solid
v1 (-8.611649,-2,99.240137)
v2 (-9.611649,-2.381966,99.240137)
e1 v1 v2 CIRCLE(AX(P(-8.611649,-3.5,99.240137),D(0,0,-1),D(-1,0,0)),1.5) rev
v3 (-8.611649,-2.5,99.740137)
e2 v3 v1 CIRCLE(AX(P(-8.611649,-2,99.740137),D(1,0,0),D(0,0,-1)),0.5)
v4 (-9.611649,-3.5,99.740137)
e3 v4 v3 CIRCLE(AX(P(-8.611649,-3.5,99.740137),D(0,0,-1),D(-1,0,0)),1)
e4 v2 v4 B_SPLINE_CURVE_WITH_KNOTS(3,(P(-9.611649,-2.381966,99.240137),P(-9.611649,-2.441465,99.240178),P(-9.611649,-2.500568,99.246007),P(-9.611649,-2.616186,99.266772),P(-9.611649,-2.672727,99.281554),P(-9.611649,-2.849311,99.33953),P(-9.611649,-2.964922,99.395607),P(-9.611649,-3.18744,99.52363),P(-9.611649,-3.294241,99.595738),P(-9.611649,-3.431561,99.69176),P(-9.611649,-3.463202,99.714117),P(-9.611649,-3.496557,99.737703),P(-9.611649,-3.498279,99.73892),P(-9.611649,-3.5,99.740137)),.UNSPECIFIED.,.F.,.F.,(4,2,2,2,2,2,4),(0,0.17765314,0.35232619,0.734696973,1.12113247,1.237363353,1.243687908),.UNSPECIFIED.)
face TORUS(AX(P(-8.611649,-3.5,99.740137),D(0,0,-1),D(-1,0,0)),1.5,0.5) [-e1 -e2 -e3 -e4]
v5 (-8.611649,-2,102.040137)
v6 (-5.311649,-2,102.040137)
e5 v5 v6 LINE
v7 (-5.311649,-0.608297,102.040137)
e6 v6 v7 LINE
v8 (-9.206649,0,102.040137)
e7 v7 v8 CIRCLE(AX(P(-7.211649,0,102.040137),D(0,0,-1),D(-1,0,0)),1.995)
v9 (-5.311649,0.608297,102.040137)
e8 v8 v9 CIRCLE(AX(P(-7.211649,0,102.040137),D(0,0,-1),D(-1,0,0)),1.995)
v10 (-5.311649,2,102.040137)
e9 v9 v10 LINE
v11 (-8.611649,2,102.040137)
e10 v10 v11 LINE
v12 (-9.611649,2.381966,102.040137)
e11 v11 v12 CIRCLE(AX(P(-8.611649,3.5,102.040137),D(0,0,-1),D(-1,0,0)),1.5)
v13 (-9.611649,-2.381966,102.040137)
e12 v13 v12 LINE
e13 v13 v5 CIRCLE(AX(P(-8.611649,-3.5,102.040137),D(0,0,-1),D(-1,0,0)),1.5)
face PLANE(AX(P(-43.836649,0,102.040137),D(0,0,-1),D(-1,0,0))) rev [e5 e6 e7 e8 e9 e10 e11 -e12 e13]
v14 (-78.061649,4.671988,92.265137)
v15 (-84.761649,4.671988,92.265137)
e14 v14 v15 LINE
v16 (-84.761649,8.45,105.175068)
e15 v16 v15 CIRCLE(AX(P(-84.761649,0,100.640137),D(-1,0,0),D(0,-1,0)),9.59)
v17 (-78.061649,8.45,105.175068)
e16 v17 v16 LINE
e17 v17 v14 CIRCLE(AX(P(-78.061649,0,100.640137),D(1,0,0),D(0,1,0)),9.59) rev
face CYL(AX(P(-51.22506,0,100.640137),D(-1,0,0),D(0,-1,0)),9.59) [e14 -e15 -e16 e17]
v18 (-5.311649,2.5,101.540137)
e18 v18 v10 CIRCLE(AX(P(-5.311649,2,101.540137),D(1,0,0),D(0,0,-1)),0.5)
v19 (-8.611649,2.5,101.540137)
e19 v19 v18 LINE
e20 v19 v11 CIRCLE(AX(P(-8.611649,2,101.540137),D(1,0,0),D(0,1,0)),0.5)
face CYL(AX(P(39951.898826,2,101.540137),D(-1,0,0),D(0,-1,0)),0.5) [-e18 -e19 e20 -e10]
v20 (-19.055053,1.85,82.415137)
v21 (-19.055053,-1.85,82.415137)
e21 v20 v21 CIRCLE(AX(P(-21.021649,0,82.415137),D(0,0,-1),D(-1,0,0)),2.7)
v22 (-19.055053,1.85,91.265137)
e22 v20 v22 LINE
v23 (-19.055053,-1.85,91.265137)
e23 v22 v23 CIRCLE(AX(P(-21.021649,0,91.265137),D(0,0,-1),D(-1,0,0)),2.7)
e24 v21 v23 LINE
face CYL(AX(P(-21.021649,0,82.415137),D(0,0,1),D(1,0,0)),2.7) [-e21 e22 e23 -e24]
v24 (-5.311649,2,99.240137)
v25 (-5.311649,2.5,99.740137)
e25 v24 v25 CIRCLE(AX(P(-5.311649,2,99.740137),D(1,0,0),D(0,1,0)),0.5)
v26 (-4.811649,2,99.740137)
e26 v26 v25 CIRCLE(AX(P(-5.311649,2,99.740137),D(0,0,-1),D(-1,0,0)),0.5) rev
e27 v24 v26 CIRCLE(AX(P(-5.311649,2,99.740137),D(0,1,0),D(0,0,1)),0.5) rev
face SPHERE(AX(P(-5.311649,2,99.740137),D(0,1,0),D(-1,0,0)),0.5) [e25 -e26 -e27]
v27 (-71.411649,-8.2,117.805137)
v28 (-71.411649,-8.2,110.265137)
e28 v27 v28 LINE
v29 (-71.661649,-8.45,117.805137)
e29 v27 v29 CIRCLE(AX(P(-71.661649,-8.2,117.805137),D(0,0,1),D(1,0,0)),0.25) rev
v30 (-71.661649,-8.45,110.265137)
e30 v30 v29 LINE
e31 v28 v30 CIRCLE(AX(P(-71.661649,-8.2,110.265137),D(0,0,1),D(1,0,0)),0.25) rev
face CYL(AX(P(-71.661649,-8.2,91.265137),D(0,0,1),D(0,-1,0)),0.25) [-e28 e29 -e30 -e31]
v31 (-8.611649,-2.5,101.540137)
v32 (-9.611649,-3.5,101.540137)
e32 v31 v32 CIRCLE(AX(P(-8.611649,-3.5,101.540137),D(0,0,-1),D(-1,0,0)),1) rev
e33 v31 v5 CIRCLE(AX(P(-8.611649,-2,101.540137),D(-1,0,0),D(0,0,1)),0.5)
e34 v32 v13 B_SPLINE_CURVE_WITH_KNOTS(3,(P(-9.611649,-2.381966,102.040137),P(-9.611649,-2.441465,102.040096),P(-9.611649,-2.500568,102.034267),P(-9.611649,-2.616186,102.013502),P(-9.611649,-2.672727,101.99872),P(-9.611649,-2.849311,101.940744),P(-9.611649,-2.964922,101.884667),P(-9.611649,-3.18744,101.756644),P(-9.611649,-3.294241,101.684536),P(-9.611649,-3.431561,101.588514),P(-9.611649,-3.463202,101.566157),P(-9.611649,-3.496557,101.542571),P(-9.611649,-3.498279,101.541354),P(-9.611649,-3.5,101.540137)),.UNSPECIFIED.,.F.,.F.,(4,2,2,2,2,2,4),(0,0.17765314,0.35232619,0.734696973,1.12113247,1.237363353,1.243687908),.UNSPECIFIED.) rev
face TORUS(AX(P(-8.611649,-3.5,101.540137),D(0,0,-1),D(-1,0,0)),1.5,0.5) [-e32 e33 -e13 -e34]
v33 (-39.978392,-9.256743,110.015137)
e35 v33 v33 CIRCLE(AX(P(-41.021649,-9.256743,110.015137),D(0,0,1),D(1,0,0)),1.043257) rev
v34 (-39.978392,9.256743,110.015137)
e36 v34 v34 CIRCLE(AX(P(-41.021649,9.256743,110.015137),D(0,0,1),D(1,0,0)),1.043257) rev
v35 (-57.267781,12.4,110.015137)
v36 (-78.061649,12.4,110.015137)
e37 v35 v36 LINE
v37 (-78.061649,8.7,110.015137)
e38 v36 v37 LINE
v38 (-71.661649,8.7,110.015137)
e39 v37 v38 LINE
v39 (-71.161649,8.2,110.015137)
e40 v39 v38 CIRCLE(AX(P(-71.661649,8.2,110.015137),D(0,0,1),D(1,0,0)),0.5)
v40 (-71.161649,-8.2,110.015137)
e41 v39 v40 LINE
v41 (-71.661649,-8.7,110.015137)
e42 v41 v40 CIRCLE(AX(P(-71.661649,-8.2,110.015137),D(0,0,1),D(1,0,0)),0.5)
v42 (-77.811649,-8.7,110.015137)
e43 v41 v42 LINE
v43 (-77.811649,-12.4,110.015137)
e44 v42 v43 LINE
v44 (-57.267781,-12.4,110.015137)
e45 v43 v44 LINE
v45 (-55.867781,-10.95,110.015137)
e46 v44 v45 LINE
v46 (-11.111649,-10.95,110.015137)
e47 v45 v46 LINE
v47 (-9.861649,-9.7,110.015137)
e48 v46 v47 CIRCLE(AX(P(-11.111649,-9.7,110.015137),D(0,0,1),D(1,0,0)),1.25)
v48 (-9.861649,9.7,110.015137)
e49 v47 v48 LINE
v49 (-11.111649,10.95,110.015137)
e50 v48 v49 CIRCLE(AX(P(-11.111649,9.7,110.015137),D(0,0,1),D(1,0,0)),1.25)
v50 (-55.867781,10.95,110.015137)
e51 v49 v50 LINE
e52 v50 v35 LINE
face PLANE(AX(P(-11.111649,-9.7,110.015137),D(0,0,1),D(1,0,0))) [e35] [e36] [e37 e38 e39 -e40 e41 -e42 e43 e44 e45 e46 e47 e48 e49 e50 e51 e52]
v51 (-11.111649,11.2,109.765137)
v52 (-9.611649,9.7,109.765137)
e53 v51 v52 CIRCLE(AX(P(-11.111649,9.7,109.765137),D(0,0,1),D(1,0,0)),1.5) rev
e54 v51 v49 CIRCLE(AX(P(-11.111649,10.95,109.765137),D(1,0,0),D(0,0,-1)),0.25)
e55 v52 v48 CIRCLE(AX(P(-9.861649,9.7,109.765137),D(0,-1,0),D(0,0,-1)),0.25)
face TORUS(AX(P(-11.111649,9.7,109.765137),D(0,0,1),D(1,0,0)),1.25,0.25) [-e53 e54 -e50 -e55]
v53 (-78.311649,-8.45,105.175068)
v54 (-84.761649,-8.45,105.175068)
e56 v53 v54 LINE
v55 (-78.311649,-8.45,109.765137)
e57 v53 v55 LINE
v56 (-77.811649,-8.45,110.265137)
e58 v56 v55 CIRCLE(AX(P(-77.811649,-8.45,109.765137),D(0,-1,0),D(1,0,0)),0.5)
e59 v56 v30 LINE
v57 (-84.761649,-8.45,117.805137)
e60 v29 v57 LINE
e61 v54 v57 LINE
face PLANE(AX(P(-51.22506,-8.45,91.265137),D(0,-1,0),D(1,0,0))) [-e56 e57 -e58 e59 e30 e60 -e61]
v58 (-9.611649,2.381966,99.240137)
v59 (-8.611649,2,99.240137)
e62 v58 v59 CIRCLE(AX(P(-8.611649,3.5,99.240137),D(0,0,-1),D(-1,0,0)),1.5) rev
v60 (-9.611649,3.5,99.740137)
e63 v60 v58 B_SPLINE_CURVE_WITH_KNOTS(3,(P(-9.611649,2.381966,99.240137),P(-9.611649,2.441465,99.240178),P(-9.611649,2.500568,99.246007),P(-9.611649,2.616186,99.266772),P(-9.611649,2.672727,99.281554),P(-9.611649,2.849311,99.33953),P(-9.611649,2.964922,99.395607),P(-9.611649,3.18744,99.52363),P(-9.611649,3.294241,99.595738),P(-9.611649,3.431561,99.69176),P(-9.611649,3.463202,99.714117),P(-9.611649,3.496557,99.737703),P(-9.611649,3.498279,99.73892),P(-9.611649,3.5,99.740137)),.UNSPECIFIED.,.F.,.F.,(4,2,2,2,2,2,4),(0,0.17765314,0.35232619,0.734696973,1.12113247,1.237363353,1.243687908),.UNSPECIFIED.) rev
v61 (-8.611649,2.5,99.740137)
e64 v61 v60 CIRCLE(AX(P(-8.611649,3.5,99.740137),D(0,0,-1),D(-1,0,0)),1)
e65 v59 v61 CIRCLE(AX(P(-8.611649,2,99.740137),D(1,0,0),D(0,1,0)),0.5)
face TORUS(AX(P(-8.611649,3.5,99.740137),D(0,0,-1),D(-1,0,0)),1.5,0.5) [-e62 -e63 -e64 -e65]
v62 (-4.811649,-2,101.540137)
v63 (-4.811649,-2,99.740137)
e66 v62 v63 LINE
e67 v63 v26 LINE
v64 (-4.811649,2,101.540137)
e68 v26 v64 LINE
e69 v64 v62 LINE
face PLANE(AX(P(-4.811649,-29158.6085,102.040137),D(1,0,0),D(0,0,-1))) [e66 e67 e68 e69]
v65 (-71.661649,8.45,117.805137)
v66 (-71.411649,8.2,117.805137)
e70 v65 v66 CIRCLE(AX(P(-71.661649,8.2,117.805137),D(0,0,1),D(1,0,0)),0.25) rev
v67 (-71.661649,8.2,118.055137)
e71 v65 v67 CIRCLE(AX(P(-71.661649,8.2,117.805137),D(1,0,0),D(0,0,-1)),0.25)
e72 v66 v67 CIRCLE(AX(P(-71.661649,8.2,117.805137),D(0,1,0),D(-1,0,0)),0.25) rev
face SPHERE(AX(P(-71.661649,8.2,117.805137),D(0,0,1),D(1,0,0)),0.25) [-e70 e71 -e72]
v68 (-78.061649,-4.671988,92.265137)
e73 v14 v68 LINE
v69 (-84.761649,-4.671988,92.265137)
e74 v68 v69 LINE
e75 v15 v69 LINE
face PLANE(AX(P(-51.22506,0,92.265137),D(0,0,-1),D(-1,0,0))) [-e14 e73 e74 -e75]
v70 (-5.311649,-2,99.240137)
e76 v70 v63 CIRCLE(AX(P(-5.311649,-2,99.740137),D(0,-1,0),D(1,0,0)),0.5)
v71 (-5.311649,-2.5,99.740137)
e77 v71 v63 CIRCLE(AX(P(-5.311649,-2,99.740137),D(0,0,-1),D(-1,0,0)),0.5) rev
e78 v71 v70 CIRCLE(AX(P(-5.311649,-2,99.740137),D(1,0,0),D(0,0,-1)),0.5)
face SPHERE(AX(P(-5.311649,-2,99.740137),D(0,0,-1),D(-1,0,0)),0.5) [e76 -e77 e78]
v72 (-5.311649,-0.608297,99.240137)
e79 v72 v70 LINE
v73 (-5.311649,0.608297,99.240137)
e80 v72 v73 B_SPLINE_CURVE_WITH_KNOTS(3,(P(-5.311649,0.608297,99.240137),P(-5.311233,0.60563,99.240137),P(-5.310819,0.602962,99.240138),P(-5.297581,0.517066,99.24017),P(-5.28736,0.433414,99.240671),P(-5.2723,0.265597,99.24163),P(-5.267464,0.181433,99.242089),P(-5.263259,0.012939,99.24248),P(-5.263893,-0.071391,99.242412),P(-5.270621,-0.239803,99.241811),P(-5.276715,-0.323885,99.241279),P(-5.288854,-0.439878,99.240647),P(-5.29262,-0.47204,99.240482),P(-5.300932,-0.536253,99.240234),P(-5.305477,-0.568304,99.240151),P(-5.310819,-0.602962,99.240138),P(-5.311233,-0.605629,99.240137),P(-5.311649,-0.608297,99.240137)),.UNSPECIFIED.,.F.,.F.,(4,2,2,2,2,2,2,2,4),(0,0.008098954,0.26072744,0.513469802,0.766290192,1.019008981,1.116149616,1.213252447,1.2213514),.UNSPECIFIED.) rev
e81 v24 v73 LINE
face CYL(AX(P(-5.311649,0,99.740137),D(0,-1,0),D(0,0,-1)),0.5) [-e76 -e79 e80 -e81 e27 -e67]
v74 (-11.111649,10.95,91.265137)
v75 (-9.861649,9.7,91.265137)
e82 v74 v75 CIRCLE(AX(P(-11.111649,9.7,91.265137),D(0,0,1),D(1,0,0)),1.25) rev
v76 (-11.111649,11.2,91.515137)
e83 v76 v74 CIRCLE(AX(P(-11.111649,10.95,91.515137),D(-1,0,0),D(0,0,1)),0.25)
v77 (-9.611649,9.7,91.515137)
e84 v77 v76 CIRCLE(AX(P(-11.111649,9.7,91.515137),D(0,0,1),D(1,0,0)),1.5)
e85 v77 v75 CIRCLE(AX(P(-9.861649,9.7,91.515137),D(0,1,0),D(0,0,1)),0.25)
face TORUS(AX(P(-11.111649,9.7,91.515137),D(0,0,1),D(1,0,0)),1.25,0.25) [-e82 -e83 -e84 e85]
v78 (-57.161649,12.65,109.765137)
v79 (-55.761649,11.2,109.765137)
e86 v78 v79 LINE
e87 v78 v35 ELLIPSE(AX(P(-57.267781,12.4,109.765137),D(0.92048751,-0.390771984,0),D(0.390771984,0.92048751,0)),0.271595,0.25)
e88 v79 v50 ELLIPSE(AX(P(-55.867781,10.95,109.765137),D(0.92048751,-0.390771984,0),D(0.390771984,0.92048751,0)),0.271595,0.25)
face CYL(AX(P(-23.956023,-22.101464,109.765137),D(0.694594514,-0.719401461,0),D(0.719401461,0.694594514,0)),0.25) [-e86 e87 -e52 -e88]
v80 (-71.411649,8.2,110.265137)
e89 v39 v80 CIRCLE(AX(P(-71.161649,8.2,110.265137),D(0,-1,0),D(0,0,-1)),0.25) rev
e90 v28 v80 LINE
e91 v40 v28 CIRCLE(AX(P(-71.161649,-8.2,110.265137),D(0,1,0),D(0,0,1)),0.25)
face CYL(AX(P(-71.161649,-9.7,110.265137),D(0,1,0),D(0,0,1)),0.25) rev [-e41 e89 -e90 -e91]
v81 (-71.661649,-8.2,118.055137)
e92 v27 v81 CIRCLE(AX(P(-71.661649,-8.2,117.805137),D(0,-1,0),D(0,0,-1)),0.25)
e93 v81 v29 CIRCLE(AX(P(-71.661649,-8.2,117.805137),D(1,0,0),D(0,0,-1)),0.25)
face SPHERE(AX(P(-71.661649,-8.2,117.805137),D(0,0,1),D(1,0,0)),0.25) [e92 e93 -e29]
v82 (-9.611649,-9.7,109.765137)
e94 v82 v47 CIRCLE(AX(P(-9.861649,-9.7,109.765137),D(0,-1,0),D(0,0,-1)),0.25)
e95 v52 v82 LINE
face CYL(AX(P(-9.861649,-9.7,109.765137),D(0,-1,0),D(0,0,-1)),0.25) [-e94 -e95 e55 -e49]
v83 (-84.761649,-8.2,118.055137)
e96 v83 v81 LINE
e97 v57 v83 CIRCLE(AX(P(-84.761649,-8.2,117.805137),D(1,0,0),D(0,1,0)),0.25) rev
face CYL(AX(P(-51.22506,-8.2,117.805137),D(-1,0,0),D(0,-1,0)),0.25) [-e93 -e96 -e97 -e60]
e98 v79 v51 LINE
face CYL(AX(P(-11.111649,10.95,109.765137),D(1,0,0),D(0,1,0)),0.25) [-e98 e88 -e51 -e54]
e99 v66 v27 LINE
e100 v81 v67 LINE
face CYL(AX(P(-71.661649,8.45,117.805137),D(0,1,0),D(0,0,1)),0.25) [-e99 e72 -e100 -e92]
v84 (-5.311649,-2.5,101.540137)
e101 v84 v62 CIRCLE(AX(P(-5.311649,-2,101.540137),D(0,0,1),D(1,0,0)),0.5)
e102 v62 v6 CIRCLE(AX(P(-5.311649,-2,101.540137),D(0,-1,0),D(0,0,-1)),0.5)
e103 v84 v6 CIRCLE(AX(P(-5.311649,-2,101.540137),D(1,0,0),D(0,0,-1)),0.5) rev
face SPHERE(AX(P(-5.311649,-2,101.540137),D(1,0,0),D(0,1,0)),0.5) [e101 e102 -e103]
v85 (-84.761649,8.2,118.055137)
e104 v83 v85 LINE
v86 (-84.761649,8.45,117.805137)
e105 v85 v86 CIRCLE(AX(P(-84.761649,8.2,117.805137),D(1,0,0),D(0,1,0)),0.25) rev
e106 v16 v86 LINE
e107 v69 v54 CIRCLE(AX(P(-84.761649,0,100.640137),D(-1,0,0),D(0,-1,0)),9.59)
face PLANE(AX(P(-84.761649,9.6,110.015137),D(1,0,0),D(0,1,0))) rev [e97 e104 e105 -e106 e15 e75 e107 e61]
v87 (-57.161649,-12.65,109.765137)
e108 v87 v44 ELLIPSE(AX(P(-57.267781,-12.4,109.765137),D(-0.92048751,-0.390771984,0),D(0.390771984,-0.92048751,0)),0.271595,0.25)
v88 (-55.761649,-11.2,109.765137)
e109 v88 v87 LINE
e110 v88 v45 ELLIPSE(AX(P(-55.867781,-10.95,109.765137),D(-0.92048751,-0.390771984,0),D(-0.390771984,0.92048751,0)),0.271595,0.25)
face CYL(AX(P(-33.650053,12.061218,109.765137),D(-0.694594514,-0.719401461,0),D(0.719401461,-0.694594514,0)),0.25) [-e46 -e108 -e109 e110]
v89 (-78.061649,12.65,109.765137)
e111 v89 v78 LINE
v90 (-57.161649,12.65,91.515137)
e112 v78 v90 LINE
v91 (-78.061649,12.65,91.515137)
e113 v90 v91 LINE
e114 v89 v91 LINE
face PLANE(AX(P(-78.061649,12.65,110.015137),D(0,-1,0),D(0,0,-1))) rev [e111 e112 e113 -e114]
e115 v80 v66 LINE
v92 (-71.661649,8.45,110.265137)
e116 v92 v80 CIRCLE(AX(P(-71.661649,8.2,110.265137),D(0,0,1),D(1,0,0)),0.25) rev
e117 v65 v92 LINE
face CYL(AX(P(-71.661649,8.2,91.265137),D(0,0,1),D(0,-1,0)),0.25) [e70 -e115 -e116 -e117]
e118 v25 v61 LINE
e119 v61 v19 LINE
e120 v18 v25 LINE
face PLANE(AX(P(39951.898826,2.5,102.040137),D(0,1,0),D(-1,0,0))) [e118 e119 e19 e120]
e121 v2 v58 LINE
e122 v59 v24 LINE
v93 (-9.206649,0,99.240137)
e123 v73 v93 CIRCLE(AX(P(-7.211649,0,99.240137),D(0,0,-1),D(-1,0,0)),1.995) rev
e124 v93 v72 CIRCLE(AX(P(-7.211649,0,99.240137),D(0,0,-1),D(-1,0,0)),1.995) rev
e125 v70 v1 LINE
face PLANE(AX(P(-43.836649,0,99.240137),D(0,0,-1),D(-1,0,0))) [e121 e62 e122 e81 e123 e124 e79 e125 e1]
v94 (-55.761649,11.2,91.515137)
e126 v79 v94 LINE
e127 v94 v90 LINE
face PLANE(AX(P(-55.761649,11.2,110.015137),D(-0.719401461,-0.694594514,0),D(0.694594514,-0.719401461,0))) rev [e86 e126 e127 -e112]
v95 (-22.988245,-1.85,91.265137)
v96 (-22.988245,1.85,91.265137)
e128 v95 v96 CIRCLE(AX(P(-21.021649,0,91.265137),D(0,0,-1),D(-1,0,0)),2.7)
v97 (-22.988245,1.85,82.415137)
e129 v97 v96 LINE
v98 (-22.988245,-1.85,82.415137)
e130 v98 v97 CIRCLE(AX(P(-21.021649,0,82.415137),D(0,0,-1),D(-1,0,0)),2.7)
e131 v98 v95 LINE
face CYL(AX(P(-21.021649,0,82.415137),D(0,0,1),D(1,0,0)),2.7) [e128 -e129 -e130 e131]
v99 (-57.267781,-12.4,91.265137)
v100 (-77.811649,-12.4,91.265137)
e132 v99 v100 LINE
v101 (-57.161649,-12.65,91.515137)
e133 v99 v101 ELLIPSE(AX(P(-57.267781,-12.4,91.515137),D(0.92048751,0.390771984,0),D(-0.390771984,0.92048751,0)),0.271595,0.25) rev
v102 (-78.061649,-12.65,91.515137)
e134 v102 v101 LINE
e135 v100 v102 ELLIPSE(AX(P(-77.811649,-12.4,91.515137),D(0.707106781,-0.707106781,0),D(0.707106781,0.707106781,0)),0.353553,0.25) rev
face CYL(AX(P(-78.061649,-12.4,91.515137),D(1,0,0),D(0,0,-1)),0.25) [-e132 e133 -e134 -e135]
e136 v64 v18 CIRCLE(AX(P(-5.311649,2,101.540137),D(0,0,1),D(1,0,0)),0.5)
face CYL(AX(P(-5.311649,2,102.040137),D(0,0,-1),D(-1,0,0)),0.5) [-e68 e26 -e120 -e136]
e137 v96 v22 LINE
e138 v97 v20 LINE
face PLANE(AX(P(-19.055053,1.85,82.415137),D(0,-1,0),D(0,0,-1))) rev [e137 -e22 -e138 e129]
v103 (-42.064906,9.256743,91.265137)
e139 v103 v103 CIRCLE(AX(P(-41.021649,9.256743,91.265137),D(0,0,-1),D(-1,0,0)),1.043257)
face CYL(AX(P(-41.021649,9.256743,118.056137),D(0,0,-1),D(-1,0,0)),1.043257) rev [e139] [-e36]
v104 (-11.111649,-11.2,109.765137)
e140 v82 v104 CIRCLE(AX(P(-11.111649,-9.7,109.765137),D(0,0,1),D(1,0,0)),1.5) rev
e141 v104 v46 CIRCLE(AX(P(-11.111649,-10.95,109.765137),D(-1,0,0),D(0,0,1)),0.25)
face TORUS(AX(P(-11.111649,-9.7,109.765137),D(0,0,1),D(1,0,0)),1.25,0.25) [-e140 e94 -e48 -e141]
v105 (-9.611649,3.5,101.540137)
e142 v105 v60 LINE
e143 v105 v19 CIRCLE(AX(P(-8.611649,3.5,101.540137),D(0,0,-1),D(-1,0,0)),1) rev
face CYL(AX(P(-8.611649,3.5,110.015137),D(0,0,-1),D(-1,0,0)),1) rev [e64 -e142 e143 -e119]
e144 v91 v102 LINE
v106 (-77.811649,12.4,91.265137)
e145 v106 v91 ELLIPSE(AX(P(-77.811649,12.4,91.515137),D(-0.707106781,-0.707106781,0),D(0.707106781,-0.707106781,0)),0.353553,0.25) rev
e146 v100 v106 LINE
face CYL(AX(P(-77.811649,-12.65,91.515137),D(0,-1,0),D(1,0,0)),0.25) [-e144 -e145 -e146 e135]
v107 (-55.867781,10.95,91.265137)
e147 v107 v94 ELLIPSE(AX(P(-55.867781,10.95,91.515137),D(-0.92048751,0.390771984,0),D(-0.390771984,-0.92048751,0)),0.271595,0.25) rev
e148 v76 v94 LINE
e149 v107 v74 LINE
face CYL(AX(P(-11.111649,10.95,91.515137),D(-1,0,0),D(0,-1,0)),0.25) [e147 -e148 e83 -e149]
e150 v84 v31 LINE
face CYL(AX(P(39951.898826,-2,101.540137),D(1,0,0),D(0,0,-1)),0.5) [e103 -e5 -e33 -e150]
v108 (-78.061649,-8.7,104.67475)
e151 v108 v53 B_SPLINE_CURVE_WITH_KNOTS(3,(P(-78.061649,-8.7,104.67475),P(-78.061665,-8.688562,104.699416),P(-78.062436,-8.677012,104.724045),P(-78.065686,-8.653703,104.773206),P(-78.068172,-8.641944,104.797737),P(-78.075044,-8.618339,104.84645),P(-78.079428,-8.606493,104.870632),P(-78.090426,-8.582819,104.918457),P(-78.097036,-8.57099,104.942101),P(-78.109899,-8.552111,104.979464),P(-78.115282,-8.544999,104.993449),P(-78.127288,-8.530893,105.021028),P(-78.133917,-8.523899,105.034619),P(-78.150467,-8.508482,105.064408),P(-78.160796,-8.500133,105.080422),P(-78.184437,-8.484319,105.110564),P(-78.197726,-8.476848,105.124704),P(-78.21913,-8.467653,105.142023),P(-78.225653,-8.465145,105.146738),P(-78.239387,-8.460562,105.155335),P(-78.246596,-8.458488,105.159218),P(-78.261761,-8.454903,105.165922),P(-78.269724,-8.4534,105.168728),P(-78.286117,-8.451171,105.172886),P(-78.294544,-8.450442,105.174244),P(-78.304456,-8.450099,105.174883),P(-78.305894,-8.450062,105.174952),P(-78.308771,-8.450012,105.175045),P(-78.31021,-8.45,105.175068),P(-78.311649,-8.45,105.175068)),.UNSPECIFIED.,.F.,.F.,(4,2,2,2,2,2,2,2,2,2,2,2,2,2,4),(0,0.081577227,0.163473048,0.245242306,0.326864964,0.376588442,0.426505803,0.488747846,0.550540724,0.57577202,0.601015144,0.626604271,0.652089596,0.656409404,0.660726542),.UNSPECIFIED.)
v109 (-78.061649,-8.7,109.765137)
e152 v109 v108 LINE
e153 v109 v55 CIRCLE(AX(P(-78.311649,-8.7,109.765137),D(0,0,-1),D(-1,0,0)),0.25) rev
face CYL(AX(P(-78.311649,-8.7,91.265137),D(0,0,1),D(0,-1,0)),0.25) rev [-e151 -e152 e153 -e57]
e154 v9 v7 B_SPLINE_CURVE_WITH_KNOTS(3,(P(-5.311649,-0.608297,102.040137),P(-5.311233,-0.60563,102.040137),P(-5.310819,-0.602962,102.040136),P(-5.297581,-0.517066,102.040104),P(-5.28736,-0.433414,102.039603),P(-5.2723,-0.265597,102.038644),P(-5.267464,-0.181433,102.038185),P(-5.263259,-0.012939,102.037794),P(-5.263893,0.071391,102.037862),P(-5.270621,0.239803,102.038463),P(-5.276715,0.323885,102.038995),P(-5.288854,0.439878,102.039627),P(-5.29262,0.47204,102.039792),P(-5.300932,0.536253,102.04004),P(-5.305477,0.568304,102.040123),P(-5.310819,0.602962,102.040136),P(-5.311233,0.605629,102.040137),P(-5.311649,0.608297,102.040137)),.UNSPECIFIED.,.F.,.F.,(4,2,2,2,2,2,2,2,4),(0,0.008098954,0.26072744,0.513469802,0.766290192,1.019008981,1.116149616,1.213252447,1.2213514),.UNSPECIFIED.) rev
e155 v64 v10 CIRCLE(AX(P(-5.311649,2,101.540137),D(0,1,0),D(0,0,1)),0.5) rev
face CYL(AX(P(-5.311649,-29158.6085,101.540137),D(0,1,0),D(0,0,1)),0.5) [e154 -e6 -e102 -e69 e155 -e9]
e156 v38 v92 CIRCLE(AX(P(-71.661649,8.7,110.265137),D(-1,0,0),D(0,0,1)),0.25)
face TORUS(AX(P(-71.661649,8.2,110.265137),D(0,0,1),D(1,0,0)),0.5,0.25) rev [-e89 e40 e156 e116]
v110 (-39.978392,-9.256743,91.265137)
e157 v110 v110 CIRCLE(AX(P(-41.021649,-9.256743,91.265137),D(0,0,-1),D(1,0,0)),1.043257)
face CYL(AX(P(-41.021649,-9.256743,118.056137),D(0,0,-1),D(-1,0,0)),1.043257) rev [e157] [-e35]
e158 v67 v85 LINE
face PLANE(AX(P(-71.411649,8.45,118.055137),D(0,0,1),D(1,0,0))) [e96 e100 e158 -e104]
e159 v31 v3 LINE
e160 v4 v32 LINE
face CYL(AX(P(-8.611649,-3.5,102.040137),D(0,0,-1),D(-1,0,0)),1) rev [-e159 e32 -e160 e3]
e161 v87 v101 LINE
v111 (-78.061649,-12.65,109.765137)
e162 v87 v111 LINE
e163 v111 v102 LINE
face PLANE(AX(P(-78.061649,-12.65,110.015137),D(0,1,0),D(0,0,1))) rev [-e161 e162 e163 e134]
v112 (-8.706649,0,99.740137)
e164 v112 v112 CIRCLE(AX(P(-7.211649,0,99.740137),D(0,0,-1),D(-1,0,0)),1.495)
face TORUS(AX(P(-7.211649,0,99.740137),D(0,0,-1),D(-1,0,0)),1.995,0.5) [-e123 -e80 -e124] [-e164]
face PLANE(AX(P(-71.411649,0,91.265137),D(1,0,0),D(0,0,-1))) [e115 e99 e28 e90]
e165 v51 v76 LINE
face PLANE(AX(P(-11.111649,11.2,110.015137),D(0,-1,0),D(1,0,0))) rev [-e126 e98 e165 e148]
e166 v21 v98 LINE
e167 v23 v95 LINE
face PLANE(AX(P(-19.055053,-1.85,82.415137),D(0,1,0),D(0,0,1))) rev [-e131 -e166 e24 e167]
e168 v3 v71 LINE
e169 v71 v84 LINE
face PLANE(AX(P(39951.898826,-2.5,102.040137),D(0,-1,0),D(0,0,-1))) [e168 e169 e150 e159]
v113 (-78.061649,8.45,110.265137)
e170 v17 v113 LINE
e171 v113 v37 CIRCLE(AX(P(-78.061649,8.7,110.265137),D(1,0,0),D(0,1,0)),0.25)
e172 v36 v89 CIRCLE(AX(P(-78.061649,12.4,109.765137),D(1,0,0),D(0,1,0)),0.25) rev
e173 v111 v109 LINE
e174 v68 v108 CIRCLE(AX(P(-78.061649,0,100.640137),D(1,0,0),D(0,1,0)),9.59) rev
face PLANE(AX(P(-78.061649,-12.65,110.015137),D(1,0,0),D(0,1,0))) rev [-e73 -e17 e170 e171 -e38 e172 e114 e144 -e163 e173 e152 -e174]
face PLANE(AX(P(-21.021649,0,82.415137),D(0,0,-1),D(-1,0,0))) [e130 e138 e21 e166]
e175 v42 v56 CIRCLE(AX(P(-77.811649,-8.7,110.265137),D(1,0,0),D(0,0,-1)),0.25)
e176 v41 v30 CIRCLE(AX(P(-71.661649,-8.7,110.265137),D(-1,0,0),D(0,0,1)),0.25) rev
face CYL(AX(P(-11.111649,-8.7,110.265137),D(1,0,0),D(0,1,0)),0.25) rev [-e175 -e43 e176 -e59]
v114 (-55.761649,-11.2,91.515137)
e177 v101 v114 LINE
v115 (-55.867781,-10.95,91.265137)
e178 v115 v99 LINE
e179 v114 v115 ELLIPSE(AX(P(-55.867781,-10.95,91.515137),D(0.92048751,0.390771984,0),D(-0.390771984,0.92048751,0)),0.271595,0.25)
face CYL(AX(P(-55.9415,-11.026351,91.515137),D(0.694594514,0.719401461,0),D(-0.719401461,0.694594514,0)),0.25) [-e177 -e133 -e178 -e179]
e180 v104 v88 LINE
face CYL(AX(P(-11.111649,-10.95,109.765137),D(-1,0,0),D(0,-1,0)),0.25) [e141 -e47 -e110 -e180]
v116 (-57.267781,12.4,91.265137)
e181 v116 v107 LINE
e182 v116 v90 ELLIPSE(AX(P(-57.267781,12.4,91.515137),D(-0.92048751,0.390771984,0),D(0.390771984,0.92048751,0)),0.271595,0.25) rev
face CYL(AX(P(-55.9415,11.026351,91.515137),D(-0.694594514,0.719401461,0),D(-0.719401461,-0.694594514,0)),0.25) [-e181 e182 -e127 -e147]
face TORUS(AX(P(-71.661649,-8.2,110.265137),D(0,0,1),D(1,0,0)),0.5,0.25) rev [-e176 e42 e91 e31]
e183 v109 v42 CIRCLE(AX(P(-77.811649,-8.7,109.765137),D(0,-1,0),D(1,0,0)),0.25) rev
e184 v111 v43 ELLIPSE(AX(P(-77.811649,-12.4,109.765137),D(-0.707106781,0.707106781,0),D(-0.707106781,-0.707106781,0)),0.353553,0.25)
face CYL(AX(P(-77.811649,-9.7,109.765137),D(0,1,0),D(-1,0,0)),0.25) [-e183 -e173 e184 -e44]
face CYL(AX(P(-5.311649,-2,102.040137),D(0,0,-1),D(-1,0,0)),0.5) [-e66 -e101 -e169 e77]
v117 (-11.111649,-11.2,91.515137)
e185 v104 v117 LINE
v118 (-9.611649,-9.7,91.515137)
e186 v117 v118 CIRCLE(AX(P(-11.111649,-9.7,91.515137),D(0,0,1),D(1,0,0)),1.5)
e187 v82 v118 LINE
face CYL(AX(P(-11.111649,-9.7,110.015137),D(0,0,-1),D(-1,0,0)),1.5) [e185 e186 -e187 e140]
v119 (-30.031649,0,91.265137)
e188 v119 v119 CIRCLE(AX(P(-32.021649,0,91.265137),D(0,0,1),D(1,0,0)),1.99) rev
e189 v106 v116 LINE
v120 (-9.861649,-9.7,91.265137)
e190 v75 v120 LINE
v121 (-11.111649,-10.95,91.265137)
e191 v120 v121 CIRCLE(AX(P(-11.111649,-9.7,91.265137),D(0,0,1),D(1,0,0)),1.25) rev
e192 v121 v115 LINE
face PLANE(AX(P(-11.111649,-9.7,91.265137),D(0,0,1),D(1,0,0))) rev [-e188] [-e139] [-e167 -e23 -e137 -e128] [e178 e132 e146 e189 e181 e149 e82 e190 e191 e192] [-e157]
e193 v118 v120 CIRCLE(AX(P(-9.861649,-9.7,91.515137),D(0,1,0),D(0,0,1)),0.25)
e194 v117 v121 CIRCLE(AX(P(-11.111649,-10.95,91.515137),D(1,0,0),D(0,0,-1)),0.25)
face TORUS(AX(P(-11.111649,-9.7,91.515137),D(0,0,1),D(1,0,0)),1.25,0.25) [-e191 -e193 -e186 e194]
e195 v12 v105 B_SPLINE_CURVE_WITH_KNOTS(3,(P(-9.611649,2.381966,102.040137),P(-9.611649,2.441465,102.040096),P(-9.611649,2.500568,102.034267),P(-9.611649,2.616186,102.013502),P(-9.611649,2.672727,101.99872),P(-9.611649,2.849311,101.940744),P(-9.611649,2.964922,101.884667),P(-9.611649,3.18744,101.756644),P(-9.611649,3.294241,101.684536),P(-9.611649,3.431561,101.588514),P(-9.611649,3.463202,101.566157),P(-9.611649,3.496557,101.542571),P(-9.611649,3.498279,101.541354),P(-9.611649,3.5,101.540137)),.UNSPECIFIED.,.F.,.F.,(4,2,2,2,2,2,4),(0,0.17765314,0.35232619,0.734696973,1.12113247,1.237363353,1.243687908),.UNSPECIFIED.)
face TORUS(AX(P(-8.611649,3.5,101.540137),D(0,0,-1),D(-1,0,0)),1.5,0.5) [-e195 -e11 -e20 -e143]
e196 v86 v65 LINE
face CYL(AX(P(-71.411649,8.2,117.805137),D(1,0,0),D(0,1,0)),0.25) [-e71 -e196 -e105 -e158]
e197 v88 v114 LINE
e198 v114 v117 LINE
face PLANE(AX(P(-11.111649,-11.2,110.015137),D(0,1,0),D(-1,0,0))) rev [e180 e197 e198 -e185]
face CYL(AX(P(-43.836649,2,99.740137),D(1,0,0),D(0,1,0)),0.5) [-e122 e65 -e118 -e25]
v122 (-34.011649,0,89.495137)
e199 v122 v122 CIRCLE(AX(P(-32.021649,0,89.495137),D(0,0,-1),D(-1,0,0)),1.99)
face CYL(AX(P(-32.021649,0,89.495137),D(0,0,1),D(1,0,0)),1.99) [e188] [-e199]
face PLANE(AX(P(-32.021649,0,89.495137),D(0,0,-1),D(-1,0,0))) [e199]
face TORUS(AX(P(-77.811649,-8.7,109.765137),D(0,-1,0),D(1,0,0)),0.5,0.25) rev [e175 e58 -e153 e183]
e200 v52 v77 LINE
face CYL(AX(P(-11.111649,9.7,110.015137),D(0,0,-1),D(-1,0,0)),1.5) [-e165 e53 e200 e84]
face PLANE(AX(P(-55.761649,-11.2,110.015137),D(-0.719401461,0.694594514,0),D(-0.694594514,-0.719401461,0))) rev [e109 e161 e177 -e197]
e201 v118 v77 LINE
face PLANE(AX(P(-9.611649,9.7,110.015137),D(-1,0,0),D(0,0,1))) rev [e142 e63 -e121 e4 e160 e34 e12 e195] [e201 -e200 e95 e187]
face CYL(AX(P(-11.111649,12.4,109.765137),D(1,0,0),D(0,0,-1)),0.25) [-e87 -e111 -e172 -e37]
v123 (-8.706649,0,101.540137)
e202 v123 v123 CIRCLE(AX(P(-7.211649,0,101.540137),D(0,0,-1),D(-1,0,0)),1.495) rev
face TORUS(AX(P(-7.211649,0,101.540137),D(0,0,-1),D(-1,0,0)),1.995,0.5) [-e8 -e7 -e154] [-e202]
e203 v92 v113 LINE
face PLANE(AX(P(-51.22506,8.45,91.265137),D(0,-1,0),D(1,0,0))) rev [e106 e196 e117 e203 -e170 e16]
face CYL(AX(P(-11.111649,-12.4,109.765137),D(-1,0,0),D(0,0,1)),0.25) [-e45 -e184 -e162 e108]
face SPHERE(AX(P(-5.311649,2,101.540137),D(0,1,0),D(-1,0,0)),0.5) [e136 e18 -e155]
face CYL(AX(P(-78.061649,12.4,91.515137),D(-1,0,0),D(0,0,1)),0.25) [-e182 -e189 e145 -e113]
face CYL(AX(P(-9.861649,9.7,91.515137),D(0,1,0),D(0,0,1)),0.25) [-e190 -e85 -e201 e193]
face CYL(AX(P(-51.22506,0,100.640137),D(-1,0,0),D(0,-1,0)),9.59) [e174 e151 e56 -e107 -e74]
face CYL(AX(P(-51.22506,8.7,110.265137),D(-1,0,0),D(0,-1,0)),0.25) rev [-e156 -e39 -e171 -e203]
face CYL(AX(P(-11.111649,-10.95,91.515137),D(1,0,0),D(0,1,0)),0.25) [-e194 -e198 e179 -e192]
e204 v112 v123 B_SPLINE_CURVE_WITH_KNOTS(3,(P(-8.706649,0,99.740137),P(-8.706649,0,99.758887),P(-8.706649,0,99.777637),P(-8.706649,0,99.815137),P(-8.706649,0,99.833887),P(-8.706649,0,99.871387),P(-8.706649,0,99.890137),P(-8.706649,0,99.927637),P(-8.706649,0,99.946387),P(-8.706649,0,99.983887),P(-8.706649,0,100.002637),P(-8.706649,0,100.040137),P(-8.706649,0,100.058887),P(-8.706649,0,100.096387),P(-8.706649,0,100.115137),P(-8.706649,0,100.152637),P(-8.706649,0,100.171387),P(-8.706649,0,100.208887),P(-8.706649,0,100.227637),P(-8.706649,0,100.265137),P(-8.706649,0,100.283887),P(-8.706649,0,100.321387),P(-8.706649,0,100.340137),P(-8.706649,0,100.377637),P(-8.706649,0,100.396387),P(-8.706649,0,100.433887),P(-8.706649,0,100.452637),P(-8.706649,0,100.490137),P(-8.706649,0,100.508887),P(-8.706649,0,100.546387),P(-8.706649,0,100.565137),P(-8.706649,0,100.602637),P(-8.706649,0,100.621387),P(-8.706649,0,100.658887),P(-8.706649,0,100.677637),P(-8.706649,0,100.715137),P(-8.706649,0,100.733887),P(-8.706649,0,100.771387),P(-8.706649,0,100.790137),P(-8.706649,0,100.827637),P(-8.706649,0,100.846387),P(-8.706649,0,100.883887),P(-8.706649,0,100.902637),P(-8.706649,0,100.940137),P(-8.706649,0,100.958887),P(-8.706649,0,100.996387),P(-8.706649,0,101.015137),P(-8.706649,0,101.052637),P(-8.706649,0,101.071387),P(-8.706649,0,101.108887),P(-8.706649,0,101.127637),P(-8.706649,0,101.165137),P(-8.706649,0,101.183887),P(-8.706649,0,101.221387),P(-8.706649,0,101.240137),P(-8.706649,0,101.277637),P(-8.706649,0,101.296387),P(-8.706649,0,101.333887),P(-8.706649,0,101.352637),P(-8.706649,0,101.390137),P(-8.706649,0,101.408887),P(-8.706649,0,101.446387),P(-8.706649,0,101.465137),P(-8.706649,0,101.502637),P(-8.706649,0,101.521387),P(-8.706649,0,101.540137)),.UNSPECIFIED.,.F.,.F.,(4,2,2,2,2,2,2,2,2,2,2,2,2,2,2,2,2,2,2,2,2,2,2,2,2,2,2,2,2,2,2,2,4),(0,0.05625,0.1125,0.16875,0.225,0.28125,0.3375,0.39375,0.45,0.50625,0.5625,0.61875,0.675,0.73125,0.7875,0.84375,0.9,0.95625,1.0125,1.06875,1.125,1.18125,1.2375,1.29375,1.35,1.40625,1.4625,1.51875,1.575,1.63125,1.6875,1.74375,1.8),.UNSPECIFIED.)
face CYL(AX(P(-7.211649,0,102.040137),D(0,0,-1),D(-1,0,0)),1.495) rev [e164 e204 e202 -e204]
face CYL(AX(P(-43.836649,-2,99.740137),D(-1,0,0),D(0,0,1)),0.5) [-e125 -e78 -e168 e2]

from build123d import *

# Parameters (mm, degrees)
BOSS_EXTRUDE1_DEPTH      = 187.5
CUT_EXTRUDE5_DEPTH       = 67
SKETCH4_W                = 80.4
SKETCH4_H                = 169
BOSS_EXTRUDE2_DEPTH      = 133.5
BOSS_EXTRUDE3_DEPTH      = 14
BOSS_EXTRUDE3_DEPTH_BACK = 14
BOSS_EXTRUDE3_START      = -93.75
SKETCH5_W                = 48
SKETCH5_H                = 50
SKETCH5_R                = 14.95
SCALE1_SCALE             = 0.1
CUT_EXTRUDE6_REACH       = 91.79
SKETCH6_R                = 1.043257281
BOSS_EXTRUDE4_DEPTH      = 8.85
SKETCH8_R                = 1.99
BOSS_EXTRUDE5_DEPTH      = 1.77
FILLET1_R                = 1
FILLET2_R                = 0.5
FILLET3_R                = 0.25


with BuildPart() as part:
    # Sketch1 → Boss-Extrude1 (new body)
    with BuildSketch(Plane.XY):
        with BuildLine():
            Line((-342.25, 126.5), (-342.25, 96))
            Line((-342.25, 96), (-409.25, 96))
            Line((-409.25, 96), (-409.25, -96))
            Line((-409.25, -96), (-342.25, -96))
            Line((-342.25, -96), (-342.25, -126.5))
            Line((-342.25, -126.5), (-133.25, -126.5))
            Line((-133.25, -126.5), (-119.25, -112))
            Line((-119.25, -112), (327.25, -112))
            ThreePointArc((327.25, -112), (337.856601718, -107.606601718), (342.25, -97))
            Line((342.25, -97), (342.25, 97))
            ThreePointArc((342.25, 97), (337.856601718, 107.606601718), (327.25, 112))
            Line((327.25, 112), (-119.25, 112))
            Line((-119.25, 112), (-133.25, 126.5))
            Line((-133.25, 126.5), (-342.25, 126.5))
        make_face()
    extrude(amount=BOSS_EXTRUDE1_DEPTH)

    # Sketch3 → Cut-Extrude5 (cut)
    with BuildSketch(Plane.ZY.offset(409.25)):
        with BuildLine():
            Line((187.5, 96), (0, 96))
            Line((0, 96), (0, -96))
            Line((0, -96), (187.5, -96))
            Line((187.5, -96), (187.5, -84.5))
            Line((187.5, -84.5), (139.09931091, -84.5))
            ThreePointArc((139.09931091, -84.5), (66.815124203, -92.039787406), (10, -46.719883347))
            Line((10, -46.719883347), (10, 46.719883347))
            ThreePointArc((10, 46.719883347), (66.815124203, 92.039787406), (139.09931091, 84.5))
            Line((139.09931091, 84.5), (187.5, 84.5))
            Line((187.5, 84.5), (187.5, 96))
        make_face()
    extrude(amount=-CUT_EXTRUDE5_DEPTH, mode=Mode.SUBTRACT)

    # Sketch4 → Boss-Extrude2 (add)
    with BuildSketch(Plane.ZY.offset(409.25)):
        with Locations((227.7, 0)):
            Rectangle(SKETCH4_W, SKETCH4_H)
    extrude(amount=-BOSS_EXTRUDE2_DEPTH)

    # Sketch5 → Boss-Extrude3 (add, two sides: drawn at the far end of the back side and taken through both)
    with BuildSketch(Plane(origin=(0, 0, 0), x_dir=(-1, 0, 0), z_dir=(0, 0, -1)).offset(BOSS_EXTRUDE3_START - BOSS_EXTRUDE3_DEPTH_BACK)):
        with Locations((-366.25, 0)):
            Rectangle(SKETCH5_W, SKETCH5_H)
        with Locations((-366.25, 0)):
            Circle(SKETCH5_R, mode=Mode.SUBTRACT)
    extrude(amount=BOSS_EXTRUDE3_DEPTH + BOSS_EXTRUDE3_DEPTH_BACK)


with BuildPart() as part_1:
    # Scale1: scaled about (-48.707387948, 0, 101.405707756)
    add(part.part.scale(SCALE1_SCALE).moved(Location((-43.836649153, 0, 91.26513698))))

    # Sketch6 → Cut-Extrude6 (cut, up to next)
    with BuildSketch(Plane(origin=(0, 0, 91.26513698), x_dir=(-1, 0, 0), z_dir=(0, 0, -1)), mode=Mode.PRIVATE) as cut_extrude6_sk1:
        with Locations((41.021649153, 9.256742719)):
            Circle(SKETCH6_R)
    cut_extrude6_tool1 = extrude(cut_extrude6_sk1.sketch, amount=-CUT_EXTRUDE6_REACH, mode=Mode.PRIVATE) & part_1.part
    # Sketch6 → Cut-Extrude6 (cut, up to next)
    with BuildSketch(Plane(origin=(0, 0, 91.26513698), x_dir=(-1, 0, 0), z_dir=(0, 0, -1)), mode=Mode.PRIVATE) as cut_extrude6_sk2:
        with Locations(Location((41.021649153, -9.256742719, 0), (0, 0, 180))):
            Circle(SKETCH6_R)
    cut_extrude6_tool2 = extrude(cut_extrude6_sk2.sketch, amount=-CUT_EXTRUDE6_REACH, mode=Mode.PRIVATE) & part_1.part
    add(cut_extrude6_tool1.solids().sort_by_distance((-41.021649, 9.256743, 91.265137))[0], mode=Mode.SUBTRACT)
    add(cut_extrude6_tool2.solids().sort_by_distance((-41.021649, -9.256743, 91.265137))[0], mode=Mode.SUBTRACT)

    # Sketch7 → Boss-Extrude4 (add)
    with BuildSketch(Plane(origin=(0, 0, 91.26513698), x_dir=(-1, 0, 0), z_dir=(0, 0, -1))):
        with BuildLine():
            Line((19.055053109, 1.85), (22.988245197, 1.85))
            ThreePointArc((22.988245197, 1.85), (23.721649153, 0), (22.988245197, -1.85))
            Line((22.988245197, -1.85), (19.055053109, -1.85))
            ThreePointArc((19.055053109, -1.85), (18.321649153, 0), (19.055053109, 1.85))
        make_face()
    extrude(amount=BOSS_EXTRUDE4_DEPTH)

    # Sketch8 → Boss-Extrude5 (add)
    with BuildSketch(Plane(origin=(0, 0, 91.26513698), x_dir=(-1, 0, 0), z_dir=(0, 0, -1))):
        with Locations(Location((32.021649153, 0, 0), (0, 0, 180))):
            Circle(SKETCH8_R)
    extrude(amount=BOSS_EXTRUDE5_DEPTH)

    # Fillet1
    fillet1_edges = [part_1.edges().sort_by_distance(p)[0] for p in [
        (-9.611649153, 2.5, 100.64013698),
        (-9.611649153, -2.5, 100.64013698),
    ]]
    fillet(fillet1_edges, radius=FILLET1_R)

    # Fillet2
    # the kernel refuses this fillet: 0.5 mm, written as the material it takes off along each edge
    with BuildSketch(Plane(origin=(-5.311649153, 2, 99.74013698), x_dir=(0, 0, -1), z_dir=(0, 1, 0))) as fillet2_piece_1_section:
        Polygon((0, 0), (FILLET2_R * 1.02, 0), (FILLET2_R * 1.02, -FILLET2_R * 1.02), (0, -FILLET2_R * 1.02), align=None)
    fillet2_piece_1 = extrude(amount=FILLET2_R * 1.02, mode=Mode.PRIVATE)
    fillet2_piece_1 = fillet2_piece_1 - Plane(origin=(-5.311649153, 2, 99.74013698), x_dir=(-0.7071067811865475, 0, 0.7071067811865475), z_dir=(0, 1, 0)) * Sphere(FILLET2_R, mode=Mode.PRIVATE)
    add(fillet2_piece_1, mode=Mode.SUBTRACT)
    with BuildSketch(Plane(origin=(-5.311649153, 2, 101.54013698), x_dir=(0, 0, 1), z_dir=(0, 1, 0))) as fillet2_piece_2_section:
        Polygon((0, 0), (FILLET2_R * 1.02, 0), (FILLET2_R * 1.02, FILLET2_R * 1.02), (0, FILLET2_R * 1.02), align=None)
    fillet2_piece_2 = extrude(amount=FILLET2_R * 1.02, mode=Mode.PRIVATE)
    fillet2_piece_2 = fillet2_piece_2 - Plane(origin=(-5.311649153, 2, 101.54013698), x_dir=(-0.7071067811865475, 0, -0.7071067811865475), z_dir=(0, 1, 0)) * Sphere(FILLET2_R, mode=Mode.PRIVATE)
    add(fillet2_piece_2, mode=Mode.SUBTRACT)
    with BuildSketch(Plane(origin=(-5.311649153, -2, 101.54013698), x_dir=(0, -1, 0), z_dir=(0, 0, 1))) as fillet2_piece_3_section:
        Polygon((0, 0), (FILLET2_R * 1.02, 0), (FILLET2_R * 1.02, FILLET2_R * 1.02), (0, FILLET2_R * 1.02), align=None)
    fillet2_piece_3 = extrude(amount=FILLET2_R * 1.02, mode=Mode.PRIVATE)
    fillet2_piece_3 = fillet2_piece_3 - Plane(origin=(-5.311649153, -2, 101.54013698), x_dir=(-0.7071067811865475, 0.7071067811865475, 0), z_dir=(0, 0, 1)) * Sphere(FILLET2_R, mode=Mode.PRIVATE)
    add(fillet2_piece_3, mode=Mode.SUBTRACT)
    with BuildSketch(Plane(origin=(-5.311649153, -2, 99.74013698), x_dir=(0, -1, 0), z_dir=(0, 0, -1))) as fillet2_piece_4_section:
        Polygon((0, 0), (FILLET2_R * 1.02, 0), (FILLET2_R * 1.02, -FILLET2_R * 1.02), (0, -FILLET2_R * 1.02), align=None)
    fillet2_piece_4 = extrude(amount=FILLET2_R * 1.02, mode=Mode.PRIVATE)
    fillet2_piece_4 = fillet2_piece_4 - Plane(origin=(-5.311649153, -2, 99.74013698), x_dir=(-0.7071067811865475, 0.7071067811865475, 0), z_dir=(0, 0, -1)) * Sphere(FILLET2_R, mode=Mode.PRIVATE)
    add(fillet2_piece_4, mode=Mode.SUBTRACT)
    with BuildSketch(Plane(origin=(-8.611649153, 2.5, 99.24013698), x_dir=(0, 0, 1), z_dir=(1, 0, 0)), Plane(origin=(-5.311649153, -2.5, 99.24013698), x_dir=(0, 0, 1), z_dir=(-1, 0, 0))) as fillet2_piece_5:
        with BuildLine():
            CenterArc((FILLET2_R, FILLET2_R), FILLET2_R, 180, 90)
            Line((0, FILLET2_R), (0, 0))
            Line((0, 0), (FILLET2_R, 0))
        make_face()
    extrude(amount=3.3, mode=Mode.SUBTRACT)
    with BuildSketch(Plane(origin=(-8.611649153, 2.5, 102.04013698), x_dir=(0, 0, -1), z_dir=(1, 0, 0)), Plane(origin=(-5.311649153, -2.5, 102.04013698), x_dir=(0, 0, -1), z_dir=(-1, 0, 0))) as fillet2_piece_6:
        with BuildLine():
            CenterArc((FILLET2_R, -FILLET2_R), FILLET2_R, 90, 90)
            Line((0, -FILLET2_R), (0, 0))
            Line((0, 0), (FILLET2_R, 0))
        make_face()
    extrude(amount=3.3, mode=Mode.SUBTRACT)
    with BuildSketch(Plane(origin=(-8.611649153, 3.5, 99.24013698), x_dir=(-0.3148458040869783, 0.9491428341660828, 0), z_dir=(0.9491428341660828, 0.3148458040869783, 0))) as fillet2_piece_7_section:
        with BuildLine():
            CenterArc((1 + FILLET2_R, FILLET2_R), FILLET2_R, 180, 90)
            Line((1 + FILLET2_R, 0), (1, 0))
            Line((1, 0), (1, FILLET2_R))
        make_face()
    fillet2_piece_7 = revolve(axis=Axis((-8.611649153, 3.5, 99.24013698), (0, 0, 1)), revolution_arc=161.648494619, mode=Mode.PRIVATE)
    fillet2_piece_7 = split(fillet2_piece_7, bisect_by=Plane(origin=(-9.611649153, 2.768902145, 99.376212943), z_dir=(1, 0, 0)), keep=Keep.TOP, mode=Mode.PRIVATE)
    add(fillet2_piece_7, mode=Mode.SUBTRACT)
    with BuildSketch(Plane(origin=(-8.611649153, 3.5, 102.04013698), x_dir=(-0.3148458040869783, 0.9491428341660828, 0), z_dir=(0.9491428341660828, 0.3148458040869783, 0))) as fillet2_piece_8_section:
        with BuildLine():
            CenterArc((1 + FILLET2_R, -FILLET2_R), FILLET2_R, 90, 90)
            Line((1, -FILLET2_R), (1, 0))
            Line((1, 0), (1 + FILLET2_R, 0))
        make_face()
    fillet2_piece_8 = revolve(axis=Axis((-8.611649153, 3.5, 102.04013698), (0, 0, 1)), revolution_arc=161.648494619, mode=Mode.PRIVATE)
    fillet2_piece_8 = split(fillet2_piece_8, bisect_by=Plane(origin=(-9.611649153, 2.768902126, 101.904061011), z_dir=(1, 0, 0)), keep=Keep.TOP, mode=Mode.PRIVATE)
    add(fillet2_piece_8, mode=Mode.SUBTRACT)
    with BuildSketch(Plane(origin=(-8.611649153, -3.5, 99.24013698), x_dir=(-0.3148458040869783, -0.9491428341660828, 0), z_dir=(0.9491428341660828, -0.3148458040869783, 0))) as fillet2_piece_9_section:
        with BuildLine():
            CenterArc((1 + FILLET2_R, -FILLET2_R), FILLET2_R, 90, 90)
            Line((1 + FILLET2_R, 0), (1, 0))
            Line((1, 0), (1, -FILLET2_R))
        make_face()
    fillet2_piece_9 = revolve(axis=Axis((-8.611649153, -3.5, 99.24013698), (0, 0, -1)), revolution_arc=161.648494619, mode=Mode.PRIVATE)
    fillet2_piece_9 = split(fillet2_piece_9, bisect_by=Plane(origin=(-9.611649153, -2.768901858, 99.376212516), z_dir=(1, 0, 0)), keep=Keep.TOP, mode=Mode.PRIVATE)
    add(fillet2_piece_9, mode=Mode.SUBTRACT)
    with BuildSketch(Plane(origin=(-8.611649153, -3.5, 102.04013698), x_dir=(-0.3148458040869783, -0.9491428341660828, 0), z_dir=(0.9491428341660828, -0.3148458040869783, 0))) as fillet2_piece_10_section:
        with BuildLine():
            CenterArc((1 + FILLET2_R, FILLET2_R), FILLET2_R, 180, 90)
            Line((1 + FILLET2_R, 0), (1, 0))
            Line((1, 0), (1, FILLET2_R))
        make_face()
    fillet2_piece_10 = revolve(axis=Axis((-8.611649153, -3.5, 102.04013698), (0, 0, -1)), revolution_arc=161.648494619, mode=Mode.PRIVATE)
    fillet2_piece_10 = split(fillet2_piece_10, bisect_by=Plane(origin=(-9.611649153, -2.768901858, 101.904061445), z_dir=(1, 0, 0)), keep=Keep.TOP, mode=Mode.PRIVATE)
    add(fillet2_piece_10, mode=Mode.SUBTRACT)
    with BuildSketch(Plane(origin=(-4.811649153, -2.5, 101.54013698), x_dir=(-1, 0, 0), z_dir=(0, 0, -1)), Plane(origin=(-4.811649153, 2.5, 101.54013698), x_dir=(0, -1, 0), z_dir=(0, 0, -1))) as fillet2_piece_11:
        with BuildLine():
            CenterArc((FILLET2_R, FILLET2_R), FILLET2_R, 180, 90)
            Line((0, FILLET2_R), (0, 0))
            Line((0, 0), (FILLET2_R, 0))
        make_face()
    extrude(amount=1.8, mode=Mode.SUBTRACT)
    with BuildSketch(Plane(origin=(-4.811649153, 2, 102.04013698), x_dir=(0, 0, -1), z_dir=(0, -1, 0))) as fillet2_piece_12:
        with BuildLine():
            CenterArc((FILLET2_R, -FILLET2_R), FILLET2_R, 90, 90)
            Line((0, -FILLET2_R), (0, 0))
            Line((0, 0), (FILLET2_R, 0))
        make_face()
    extrude(amount=4, mode=Mode.SUBTRACT)
    with BuildSketch(Plane(origin=(-7.211649153, 0, 102.04013698), x_dir=(-1, 0, 0), z_dir=(0, -1, 0))) as fillet2_piece_13:
        with BuildLine():
            CenterArc((1.495 + FILLET2_R, FILLET2_R), FILLET2_R, 180, 90)
            Line((1.495, FILLET2_R), (1.495, 0))
            Line((1.495, 0), (1.495 + FILLET2_R, 0))
        make_face()
    revolve(axis=Axis((-7.211649153, 0, 102.04013698), (0, 0, -1)), mode=Mode.SUBTRACT)
    with BuildSketch(Plane(origin=(-7.211649153, 0, 99.24013698), x_dir=(-1, 0, 0), z_dir=(0, -1, 0))) as fillet2_piece_14:
        with BuildLine():
            CenterArc((1.495 + FILLET2_R, -FILLET2_R), FILLET2_R, 90, 90)
            Line((1.495 + FILLET2_R, 0), (1.495, 0))
            Line((1.495, 0), (1.495, -FILLET2_R))
        make_face()
    revolve(axis=Axis((-7.211649153, 0, 99.24013698), (0, 0, -1)), mode=Mode.SUBTRACT)
    with BuildSketch(Plane(origin=(-4.811649153, 2, 99.24013698), x_dir=(0, 0, 1), z_dir=(0, -1, 0))) as fillet2_piece_15:
        with BuildLine():
            CenterArc((FILLET2_R, FILLET2_R), FILLET2_R, 180, 90)
            Line((0, FILLET2_R), (0, 0))
            Line((0, 0), (FILLET2_R, 0))
        make_face()
    extrude(amount=4, mode=Mode.SUBTRACT)

    # Fillet3
    fillet3_edges = [part_1.edges().sort_by_distance(p)[0] for p in [
        (-78.061649153, -8.45, 107.595102526),
        (-74.736649153, 8.45, 110.01513698),
        (-74.736649153, -8.45, 110.01513698),
        (-33.436649153, -11.2, 110.01513698),
        (-10.050988981, -10.760660172, 110.01513698),
        (-9.611649153, 0, 110.01513698),
        (-10.050988981, 10.760660172, 110.01513698),
        (-33.436649153, 11.2, 91.26513698),
        (-10.050988981, 10.760660172, 91.26513698),
        (-9.611649153, 0, 91.26513698),
        (-10.050988981, -10.760660172, 91.26513698),
        (-71.411649153, 0, 110.01513698),
        (-71.411649153, -8.45, 114.03513698),
        (-71.411649153, 8.45, 114.03513698),
        (-78.086649153, -8.45, 118.05513698),
        (-78.086649153, 8.45, 118.05513698),
        (-71.411649153, 0, 118.05513698),
        (-78.061649153, -10.55, 110.01513698),
        (-67.611649153, -12.65, 110.01513698),
        (-56.461649153, -11.925, 110.01513698),
        (-33.436649153, 11.2, 110.01513698),
        (-56.461649153, 11.925, 110.01513698),
        (-67.611649153, 12.65, 110.01513698),
        (-67.611649153, 12.65, 91.26513698),
        (-56.461649153, 11.925, 91.26513698),
        (-78.061649153, 0, 91.26513698),
        (-67.611649153, -12.65, 91.26513698),
        (-56.461649153, -11.925, 91.26513698),
        (-33.436649153, -11.2, 91.26513698),
    ]]
    fillet(fillet3_edges, radius=FILLET3_R)


solid = part_1.part
